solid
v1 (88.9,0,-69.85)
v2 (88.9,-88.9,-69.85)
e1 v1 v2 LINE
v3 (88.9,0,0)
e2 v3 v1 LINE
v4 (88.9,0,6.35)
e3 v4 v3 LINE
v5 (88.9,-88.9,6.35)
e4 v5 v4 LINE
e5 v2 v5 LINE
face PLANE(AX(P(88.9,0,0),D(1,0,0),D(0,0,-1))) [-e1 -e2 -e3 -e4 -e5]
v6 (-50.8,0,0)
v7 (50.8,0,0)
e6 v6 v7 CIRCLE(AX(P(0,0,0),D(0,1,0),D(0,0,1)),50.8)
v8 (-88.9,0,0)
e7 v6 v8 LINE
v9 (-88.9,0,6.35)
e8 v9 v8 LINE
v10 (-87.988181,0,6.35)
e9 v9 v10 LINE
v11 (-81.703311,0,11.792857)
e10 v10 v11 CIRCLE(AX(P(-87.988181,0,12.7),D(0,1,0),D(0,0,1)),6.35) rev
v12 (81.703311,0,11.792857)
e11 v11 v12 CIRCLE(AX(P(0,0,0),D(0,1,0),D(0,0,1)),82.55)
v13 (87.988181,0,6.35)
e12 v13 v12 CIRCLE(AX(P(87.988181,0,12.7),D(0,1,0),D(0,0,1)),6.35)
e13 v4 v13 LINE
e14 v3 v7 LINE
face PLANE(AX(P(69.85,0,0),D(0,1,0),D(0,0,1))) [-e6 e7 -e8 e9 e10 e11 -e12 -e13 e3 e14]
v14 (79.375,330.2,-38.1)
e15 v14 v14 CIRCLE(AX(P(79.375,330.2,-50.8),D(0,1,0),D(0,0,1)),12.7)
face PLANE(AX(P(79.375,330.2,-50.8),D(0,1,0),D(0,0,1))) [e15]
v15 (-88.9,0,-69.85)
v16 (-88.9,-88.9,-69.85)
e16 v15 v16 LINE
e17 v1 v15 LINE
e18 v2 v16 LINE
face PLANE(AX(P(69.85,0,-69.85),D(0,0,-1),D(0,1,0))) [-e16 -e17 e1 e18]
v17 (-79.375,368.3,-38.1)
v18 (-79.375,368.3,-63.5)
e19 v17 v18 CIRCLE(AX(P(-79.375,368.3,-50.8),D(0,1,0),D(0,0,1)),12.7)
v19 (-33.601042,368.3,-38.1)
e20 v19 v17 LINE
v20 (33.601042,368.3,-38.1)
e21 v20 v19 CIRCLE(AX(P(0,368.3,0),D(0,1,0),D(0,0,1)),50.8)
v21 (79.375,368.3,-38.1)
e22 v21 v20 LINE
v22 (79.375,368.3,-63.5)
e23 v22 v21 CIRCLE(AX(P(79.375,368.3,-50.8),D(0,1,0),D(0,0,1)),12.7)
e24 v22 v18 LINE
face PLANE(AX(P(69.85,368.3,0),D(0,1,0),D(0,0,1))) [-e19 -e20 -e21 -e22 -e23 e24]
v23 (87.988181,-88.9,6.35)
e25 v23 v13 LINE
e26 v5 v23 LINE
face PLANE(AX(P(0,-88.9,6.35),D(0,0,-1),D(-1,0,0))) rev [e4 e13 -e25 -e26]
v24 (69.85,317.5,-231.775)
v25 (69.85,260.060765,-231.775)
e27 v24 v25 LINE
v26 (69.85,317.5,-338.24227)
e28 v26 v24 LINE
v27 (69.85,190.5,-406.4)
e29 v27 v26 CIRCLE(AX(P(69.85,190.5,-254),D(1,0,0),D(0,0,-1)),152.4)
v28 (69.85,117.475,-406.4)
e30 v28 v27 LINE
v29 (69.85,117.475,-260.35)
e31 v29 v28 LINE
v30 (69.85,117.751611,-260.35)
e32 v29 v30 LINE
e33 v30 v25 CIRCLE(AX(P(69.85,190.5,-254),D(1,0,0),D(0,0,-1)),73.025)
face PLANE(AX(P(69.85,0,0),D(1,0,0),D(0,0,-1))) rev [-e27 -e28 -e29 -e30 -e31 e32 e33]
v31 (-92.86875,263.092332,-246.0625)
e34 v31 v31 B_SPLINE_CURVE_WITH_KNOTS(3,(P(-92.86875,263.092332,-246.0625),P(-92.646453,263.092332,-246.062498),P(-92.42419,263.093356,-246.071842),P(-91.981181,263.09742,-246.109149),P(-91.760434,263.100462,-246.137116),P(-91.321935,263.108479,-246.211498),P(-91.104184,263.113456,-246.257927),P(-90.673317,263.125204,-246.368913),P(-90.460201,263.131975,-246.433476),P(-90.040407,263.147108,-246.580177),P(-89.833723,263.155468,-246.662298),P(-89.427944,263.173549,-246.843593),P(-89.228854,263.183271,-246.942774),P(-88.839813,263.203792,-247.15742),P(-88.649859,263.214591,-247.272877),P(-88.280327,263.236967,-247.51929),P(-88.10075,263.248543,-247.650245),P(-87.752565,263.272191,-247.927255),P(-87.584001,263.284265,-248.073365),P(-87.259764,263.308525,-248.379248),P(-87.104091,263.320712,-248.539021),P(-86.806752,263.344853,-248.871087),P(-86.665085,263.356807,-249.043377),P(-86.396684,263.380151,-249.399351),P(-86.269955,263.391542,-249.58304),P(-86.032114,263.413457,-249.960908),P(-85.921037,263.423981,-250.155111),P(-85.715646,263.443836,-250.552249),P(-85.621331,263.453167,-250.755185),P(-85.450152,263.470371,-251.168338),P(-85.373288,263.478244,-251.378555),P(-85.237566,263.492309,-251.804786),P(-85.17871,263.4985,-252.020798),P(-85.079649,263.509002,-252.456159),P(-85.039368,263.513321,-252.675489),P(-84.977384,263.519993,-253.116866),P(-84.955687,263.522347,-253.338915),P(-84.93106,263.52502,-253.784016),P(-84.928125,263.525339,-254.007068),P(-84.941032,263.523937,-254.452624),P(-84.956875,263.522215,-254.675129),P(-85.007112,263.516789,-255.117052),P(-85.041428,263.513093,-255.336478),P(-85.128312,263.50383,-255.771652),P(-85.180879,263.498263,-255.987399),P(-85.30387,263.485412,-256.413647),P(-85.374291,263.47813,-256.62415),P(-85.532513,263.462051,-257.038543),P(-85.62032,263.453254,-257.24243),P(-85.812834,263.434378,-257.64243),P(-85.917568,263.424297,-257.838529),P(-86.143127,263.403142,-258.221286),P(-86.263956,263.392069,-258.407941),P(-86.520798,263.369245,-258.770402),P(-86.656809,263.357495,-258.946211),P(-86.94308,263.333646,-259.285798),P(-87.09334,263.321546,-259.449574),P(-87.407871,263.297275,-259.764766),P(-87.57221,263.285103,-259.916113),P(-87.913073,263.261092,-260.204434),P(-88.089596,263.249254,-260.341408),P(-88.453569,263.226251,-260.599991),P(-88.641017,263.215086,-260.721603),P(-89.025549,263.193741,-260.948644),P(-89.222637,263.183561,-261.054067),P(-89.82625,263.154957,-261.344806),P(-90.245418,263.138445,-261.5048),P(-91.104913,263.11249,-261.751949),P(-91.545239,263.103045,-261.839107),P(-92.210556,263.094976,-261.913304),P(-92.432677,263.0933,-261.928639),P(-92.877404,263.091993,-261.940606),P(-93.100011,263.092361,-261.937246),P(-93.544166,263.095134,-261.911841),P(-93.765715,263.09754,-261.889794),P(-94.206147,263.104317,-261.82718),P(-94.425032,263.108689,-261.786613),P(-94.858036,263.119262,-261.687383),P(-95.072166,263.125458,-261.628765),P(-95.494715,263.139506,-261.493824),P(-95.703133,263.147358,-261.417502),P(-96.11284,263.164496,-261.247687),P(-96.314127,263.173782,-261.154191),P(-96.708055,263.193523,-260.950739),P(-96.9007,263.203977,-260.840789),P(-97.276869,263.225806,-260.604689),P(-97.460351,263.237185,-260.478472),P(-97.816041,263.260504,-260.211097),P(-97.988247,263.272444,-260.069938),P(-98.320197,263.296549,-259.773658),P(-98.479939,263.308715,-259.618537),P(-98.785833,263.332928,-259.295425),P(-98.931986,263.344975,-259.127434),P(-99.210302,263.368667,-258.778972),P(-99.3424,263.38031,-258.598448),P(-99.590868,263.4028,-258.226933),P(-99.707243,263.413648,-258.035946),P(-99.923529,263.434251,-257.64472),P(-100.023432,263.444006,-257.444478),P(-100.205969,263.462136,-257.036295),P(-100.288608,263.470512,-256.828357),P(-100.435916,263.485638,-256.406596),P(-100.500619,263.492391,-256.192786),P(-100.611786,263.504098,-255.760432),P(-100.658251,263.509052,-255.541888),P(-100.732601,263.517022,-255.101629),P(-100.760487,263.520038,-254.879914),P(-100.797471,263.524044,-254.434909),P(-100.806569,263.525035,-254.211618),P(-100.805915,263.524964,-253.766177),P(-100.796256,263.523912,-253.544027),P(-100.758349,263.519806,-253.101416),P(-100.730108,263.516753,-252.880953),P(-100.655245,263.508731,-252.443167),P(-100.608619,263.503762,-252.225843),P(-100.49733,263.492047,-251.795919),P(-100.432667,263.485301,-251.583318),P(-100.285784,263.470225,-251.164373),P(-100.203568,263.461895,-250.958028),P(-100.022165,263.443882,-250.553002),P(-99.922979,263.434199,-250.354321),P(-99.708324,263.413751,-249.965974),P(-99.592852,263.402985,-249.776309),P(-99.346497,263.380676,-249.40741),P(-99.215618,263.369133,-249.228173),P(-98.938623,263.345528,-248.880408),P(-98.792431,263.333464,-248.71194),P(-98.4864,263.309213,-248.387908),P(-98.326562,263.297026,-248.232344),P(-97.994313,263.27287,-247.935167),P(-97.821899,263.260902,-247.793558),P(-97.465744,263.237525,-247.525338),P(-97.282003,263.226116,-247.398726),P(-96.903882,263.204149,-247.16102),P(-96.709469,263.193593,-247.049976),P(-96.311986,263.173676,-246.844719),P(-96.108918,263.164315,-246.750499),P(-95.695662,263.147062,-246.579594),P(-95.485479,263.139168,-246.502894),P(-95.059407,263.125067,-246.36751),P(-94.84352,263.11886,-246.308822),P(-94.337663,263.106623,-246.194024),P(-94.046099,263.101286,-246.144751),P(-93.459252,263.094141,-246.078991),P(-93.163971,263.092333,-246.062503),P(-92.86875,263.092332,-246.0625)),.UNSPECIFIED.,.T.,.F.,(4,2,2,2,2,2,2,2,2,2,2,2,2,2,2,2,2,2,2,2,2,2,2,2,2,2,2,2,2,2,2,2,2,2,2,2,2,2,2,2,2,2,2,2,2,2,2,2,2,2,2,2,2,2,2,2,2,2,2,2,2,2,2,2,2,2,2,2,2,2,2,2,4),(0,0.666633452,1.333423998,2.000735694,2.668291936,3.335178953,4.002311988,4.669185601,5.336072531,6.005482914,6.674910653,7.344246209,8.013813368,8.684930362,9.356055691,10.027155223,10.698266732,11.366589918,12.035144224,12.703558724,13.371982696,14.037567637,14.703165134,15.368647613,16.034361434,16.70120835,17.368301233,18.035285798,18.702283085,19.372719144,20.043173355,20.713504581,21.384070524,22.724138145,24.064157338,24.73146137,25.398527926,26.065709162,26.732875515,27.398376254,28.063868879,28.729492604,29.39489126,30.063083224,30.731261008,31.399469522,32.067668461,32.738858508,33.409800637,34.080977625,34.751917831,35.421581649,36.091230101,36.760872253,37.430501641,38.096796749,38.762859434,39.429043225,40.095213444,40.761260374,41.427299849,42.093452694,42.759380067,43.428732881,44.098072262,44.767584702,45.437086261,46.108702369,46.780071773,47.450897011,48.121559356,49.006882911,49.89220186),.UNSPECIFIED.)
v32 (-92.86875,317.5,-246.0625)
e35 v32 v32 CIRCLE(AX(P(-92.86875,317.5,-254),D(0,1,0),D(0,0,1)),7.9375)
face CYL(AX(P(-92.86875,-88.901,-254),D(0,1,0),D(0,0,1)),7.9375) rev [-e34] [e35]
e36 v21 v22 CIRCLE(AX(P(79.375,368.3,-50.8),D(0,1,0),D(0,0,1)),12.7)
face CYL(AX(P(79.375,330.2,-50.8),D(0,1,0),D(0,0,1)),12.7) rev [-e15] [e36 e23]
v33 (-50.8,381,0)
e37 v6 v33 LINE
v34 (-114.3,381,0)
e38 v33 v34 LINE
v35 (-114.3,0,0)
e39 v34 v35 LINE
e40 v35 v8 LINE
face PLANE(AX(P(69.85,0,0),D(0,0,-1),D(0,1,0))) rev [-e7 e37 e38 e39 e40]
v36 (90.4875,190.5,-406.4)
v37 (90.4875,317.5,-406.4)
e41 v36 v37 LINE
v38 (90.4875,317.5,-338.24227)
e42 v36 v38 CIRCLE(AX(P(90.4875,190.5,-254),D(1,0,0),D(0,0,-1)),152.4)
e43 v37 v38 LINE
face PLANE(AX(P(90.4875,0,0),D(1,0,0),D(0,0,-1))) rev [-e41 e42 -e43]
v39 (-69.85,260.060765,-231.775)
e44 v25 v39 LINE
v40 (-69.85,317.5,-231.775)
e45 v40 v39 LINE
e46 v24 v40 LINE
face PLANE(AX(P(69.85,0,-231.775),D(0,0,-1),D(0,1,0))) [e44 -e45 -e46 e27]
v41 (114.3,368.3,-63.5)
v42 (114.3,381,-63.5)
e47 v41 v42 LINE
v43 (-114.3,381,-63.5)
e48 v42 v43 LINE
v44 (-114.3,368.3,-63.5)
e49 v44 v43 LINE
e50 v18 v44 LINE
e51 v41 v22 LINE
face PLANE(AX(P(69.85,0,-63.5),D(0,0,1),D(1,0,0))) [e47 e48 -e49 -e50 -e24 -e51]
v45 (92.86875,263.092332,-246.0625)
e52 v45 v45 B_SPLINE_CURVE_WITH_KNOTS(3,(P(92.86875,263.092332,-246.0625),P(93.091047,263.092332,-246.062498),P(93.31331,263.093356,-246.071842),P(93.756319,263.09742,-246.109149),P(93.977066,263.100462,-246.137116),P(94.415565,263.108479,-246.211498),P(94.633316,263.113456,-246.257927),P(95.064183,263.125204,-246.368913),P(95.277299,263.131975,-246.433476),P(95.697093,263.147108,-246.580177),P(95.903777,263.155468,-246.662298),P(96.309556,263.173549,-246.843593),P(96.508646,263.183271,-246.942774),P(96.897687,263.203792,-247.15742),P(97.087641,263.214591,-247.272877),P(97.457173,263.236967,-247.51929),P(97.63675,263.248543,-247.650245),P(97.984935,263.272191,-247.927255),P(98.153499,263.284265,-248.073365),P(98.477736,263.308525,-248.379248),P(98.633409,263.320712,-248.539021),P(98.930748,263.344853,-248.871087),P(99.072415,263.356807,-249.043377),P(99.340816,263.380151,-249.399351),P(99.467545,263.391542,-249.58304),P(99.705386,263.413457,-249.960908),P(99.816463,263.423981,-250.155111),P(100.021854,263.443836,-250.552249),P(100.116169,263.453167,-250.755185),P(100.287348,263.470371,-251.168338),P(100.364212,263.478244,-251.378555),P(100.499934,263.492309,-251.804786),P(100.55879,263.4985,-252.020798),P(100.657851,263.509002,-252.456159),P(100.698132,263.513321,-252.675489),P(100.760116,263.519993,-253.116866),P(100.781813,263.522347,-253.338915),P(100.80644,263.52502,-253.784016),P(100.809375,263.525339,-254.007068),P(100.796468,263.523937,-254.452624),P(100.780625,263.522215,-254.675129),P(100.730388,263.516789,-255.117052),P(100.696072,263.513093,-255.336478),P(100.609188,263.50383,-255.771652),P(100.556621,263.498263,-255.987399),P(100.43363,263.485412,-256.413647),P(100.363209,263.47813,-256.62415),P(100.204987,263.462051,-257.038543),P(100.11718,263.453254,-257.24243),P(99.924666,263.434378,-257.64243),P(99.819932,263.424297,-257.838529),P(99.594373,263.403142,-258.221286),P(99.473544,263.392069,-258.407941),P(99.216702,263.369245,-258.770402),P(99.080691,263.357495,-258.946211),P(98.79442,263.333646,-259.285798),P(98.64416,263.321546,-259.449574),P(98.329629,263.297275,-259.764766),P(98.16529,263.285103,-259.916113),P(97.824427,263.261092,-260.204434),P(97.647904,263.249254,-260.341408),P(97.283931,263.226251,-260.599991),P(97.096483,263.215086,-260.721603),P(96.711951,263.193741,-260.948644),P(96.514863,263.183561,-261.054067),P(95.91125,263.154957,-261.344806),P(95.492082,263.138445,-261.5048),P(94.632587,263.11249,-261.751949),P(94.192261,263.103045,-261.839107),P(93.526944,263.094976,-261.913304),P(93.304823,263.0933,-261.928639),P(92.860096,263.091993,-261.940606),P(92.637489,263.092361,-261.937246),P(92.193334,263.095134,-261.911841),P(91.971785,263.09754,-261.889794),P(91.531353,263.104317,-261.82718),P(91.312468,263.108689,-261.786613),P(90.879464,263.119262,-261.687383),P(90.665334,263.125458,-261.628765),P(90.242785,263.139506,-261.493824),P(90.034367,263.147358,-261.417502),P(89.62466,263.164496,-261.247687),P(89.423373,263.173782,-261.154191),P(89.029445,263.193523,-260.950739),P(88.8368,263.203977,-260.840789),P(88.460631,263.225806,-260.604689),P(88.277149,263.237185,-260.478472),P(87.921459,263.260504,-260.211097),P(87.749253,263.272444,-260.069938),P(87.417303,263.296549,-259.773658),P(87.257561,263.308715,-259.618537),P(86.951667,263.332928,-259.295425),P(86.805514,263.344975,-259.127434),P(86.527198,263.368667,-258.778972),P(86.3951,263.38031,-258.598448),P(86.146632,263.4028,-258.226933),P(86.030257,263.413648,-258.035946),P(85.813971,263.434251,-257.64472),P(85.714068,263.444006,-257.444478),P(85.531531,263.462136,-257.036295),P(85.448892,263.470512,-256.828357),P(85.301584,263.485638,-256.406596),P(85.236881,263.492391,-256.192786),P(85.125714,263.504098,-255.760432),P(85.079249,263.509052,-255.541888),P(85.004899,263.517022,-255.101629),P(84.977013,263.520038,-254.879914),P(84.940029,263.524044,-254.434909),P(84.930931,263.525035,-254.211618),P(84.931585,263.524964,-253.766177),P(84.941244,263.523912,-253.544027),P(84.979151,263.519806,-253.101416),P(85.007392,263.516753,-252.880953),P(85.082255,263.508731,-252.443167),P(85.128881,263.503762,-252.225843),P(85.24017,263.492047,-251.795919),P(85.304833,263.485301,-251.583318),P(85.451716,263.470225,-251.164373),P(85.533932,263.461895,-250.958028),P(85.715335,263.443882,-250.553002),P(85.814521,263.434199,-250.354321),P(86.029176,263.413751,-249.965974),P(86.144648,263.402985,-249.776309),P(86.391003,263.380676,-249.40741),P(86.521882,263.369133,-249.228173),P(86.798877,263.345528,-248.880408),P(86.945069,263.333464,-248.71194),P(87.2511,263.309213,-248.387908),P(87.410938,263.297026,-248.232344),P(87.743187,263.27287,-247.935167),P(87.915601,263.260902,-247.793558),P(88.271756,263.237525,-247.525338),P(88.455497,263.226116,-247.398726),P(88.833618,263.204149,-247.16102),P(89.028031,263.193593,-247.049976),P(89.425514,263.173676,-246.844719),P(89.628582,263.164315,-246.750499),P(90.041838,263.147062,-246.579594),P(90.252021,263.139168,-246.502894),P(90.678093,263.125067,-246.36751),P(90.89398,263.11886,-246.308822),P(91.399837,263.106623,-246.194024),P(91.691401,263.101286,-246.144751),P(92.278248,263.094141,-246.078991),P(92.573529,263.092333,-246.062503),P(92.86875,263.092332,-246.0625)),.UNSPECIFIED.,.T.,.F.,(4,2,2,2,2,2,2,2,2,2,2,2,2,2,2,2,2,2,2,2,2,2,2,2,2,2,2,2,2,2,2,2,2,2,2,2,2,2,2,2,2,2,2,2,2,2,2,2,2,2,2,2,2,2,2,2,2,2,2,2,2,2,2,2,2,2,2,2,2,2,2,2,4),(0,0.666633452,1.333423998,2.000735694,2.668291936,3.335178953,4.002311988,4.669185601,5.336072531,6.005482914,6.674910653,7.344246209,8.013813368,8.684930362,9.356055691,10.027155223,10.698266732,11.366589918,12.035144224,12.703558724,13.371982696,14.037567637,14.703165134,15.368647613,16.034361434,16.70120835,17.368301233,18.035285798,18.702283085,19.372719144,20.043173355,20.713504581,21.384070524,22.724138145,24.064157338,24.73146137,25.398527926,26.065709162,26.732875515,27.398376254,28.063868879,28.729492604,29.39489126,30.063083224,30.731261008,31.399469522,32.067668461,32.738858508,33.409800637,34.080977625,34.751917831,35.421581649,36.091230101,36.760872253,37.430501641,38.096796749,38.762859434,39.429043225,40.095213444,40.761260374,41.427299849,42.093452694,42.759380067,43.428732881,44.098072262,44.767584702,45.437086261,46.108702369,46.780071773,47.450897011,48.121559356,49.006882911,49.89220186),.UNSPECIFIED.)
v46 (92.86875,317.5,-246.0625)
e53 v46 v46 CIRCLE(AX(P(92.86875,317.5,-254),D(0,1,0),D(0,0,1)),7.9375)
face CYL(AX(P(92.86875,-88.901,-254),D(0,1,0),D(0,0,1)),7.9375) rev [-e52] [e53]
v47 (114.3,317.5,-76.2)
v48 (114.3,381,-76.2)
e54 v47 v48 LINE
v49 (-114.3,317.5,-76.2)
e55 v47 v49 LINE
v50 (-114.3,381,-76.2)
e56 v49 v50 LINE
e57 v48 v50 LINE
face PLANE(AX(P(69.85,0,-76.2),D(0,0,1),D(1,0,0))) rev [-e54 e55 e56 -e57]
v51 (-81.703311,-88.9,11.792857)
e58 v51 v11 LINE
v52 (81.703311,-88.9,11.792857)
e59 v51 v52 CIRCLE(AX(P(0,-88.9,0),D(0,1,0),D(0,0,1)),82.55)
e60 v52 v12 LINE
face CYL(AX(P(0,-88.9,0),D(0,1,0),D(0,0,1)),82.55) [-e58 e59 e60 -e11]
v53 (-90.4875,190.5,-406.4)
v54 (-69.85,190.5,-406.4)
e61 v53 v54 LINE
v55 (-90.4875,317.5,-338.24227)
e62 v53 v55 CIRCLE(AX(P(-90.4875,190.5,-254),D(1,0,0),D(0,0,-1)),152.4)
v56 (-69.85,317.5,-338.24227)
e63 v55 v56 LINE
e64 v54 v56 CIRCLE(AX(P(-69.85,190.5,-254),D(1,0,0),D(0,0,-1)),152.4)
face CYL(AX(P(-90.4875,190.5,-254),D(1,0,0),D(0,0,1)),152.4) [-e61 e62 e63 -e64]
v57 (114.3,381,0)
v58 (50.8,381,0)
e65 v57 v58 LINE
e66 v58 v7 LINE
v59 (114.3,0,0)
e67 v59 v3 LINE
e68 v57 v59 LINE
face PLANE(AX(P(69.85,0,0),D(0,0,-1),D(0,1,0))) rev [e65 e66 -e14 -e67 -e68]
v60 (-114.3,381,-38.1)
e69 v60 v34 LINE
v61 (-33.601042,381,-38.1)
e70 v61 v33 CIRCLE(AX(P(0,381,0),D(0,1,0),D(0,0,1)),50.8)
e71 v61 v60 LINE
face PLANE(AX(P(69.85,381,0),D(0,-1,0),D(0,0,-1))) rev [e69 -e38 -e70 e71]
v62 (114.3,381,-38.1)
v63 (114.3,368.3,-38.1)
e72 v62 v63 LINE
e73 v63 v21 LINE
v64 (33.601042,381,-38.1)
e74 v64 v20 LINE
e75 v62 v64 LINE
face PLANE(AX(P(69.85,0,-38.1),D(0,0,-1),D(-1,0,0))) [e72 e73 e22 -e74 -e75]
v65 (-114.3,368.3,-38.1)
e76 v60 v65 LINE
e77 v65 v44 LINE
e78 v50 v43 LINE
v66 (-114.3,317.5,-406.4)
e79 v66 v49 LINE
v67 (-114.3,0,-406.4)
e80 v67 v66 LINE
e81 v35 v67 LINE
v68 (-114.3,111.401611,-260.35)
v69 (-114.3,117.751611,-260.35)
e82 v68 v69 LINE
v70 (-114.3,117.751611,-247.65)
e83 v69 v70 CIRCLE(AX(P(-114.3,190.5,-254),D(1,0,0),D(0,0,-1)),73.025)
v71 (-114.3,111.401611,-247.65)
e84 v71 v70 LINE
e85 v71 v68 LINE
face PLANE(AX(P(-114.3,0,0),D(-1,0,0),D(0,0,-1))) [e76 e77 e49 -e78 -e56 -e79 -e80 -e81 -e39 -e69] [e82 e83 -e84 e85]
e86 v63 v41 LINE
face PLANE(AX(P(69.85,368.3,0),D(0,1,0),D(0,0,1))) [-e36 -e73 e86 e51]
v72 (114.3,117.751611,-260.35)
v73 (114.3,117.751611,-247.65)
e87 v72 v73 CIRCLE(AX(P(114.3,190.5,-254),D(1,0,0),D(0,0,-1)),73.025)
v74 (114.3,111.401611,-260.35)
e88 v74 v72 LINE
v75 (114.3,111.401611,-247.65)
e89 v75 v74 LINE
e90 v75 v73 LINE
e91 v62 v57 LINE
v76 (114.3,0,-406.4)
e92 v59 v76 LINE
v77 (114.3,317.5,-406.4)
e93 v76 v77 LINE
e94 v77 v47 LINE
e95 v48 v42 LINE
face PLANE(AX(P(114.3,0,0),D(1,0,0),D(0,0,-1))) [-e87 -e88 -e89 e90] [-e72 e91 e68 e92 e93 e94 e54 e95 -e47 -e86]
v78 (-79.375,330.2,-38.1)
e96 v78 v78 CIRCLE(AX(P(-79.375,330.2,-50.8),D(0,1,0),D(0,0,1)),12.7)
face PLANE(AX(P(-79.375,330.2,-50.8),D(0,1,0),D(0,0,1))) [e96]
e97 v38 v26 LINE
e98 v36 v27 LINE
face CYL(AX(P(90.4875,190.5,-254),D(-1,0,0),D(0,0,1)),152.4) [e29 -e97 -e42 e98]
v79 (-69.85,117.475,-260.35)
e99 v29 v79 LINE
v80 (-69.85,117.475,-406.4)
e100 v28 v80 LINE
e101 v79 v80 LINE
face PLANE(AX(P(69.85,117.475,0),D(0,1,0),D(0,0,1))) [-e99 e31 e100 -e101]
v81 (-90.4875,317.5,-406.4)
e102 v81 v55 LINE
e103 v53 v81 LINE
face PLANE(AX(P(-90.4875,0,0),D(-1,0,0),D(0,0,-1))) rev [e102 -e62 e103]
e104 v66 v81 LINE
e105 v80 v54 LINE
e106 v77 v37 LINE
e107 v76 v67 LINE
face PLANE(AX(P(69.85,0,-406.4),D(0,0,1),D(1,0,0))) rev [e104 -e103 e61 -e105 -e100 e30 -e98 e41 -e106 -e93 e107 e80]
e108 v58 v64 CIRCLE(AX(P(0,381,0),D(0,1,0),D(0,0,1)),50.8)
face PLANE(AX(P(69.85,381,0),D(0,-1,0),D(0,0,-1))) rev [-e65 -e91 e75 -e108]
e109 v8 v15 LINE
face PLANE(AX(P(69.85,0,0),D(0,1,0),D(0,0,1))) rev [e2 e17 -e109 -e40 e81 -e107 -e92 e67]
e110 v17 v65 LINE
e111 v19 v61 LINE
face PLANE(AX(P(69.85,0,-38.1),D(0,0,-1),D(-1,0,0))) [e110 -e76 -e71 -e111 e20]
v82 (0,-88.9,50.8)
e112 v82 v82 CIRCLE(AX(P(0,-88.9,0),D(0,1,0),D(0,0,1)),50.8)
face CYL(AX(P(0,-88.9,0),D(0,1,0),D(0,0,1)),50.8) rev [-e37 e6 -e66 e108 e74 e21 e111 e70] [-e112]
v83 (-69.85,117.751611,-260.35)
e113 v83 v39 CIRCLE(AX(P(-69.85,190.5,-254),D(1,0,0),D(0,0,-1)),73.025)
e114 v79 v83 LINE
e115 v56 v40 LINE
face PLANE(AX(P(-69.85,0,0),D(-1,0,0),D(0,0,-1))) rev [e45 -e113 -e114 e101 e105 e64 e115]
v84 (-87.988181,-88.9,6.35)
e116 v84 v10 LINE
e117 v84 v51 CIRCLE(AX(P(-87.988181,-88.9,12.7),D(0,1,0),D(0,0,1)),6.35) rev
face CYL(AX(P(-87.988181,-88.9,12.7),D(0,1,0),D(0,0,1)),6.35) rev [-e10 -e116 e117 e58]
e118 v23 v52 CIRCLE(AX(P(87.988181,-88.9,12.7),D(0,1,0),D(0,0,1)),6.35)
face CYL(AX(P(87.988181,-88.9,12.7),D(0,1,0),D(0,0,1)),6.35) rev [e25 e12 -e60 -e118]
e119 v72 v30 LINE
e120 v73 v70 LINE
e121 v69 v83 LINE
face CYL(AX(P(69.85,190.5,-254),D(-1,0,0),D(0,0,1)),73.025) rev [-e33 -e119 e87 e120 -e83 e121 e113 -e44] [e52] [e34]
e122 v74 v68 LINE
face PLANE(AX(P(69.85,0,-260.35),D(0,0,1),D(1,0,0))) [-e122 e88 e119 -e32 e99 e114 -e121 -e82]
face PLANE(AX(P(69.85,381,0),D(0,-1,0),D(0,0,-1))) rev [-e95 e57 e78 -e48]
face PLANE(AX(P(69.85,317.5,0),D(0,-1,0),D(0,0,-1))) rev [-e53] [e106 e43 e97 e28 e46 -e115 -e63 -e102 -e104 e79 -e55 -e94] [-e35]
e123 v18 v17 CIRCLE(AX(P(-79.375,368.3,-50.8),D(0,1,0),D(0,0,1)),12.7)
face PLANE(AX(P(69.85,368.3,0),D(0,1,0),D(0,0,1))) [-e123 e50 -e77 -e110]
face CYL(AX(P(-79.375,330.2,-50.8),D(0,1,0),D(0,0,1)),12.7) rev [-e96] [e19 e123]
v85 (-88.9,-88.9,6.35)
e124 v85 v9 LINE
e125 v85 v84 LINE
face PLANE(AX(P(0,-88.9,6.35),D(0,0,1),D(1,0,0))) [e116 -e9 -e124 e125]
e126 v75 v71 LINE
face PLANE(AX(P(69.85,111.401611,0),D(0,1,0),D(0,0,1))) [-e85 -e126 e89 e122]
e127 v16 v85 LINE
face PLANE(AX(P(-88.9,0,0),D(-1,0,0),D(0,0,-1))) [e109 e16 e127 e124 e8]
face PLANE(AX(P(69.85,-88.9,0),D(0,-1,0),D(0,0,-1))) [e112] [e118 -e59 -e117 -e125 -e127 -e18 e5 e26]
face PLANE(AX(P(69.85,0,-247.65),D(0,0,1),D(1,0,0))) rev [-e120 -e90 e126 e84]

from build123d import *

# Parameters (mm, degrees)
BOSS_EXTRUDE2_DEPTH     = 69.85
BOSS_EXTRUDE3_START     = 69.85
BOSS_EXTRUDE3_DEPTH     = 20.6375
BOSS_EXTRUDE4_START     = 90.4875
BOSS_EXTRUDE4_DEPTH     = 23.8125
BOSS_EXTRUDE5_START     = 69.85
BOSS_EXTRUDE5_DEPTH     = 19.05
SKETCH2_R               = 50.8
CUT_EXTRUDE1_DEPTH      = 632.689369865
SKETCH3_R               = 12.7
CUT_EXTRUDE2_DEPTH      = 38.1
CUT_EXTRUDE3_REACH      = 587.992
CUT_EXTRUDE3_END_RADIUS = 73.025
SKETCH4_R               = 7.9375


# Read off the part's stored shape, not the designer's step: Boss-Extrude4
with BuildPart() as part:
    # Sketch1 → Boss-Extrude2 (new body)
    with BuildSketch(Plane(origin=(0, 0, 0), x_dir=(0, 0, -1), z_dir=(1, 0, 0))):
        with BuildLine():
            Line((0, 381), (0, 0))
            Line((0, 0), (-82.55, 0))
            Line((-82.55, 0), (-82.55, -88.9))
            Line((-82.55, -88.9), (69.85, -88.9))
            Line((69.85, -88.9), (69.85, 0))
            Line((69.85, 0), (406.4, 0))
            Line((406.4, 0), (406.4, 117.475))
            Line((406.4, 117.475), (260.35, 117.475))
            Line((260.35, 117.475), (260.35, 111.401610843))
            Line((260.35, 111.401610843), (247.65, 111.401610843))
            Line((247.65, 111.401610843), (247.65, 117.751610843))
            ThreePointArc((247.65, 117.751610843), (181.425166335, 182.404066236), (231.775, 260.060764803))
            Line((231.775, 260.060764803), (231.775, 317.5))
            Line((231.775, 317.5), (76.2, 317.5))
            Line((76.2, 317.5), (76.2, 381))
            Line((76.2, 381), (63.5, 381))
            Line((63.5, 381), (63.5, 368.3))
            Line((63.5, 368.3), (38.1, 368.3))
            Line((38.1, 368.3), (38.1, 381))
            Line((38.1, 381), (0, 381))
        make_face()
    boss_extrude2 = extrude(amount=BOSS_EXTRUDE2_DEPTH)

    # Sketch1<4> → Boss-Extrude3 (add)
    with BuildSketch(Plane(origin=(0, 0, 0), x_dir=(0, 0, -1), z_dir=(1, 0, 0)).offset(BOSS_EXTRUDE3_START)):
        with BuildLine():
            Line((0, 381), (0, 0))
            Line((0, 0), (406.4, 0))
            Line((406.4, 0), (406.4, 190.5))
            ThreePointArc((406.4, 190.5), (388.283807472, 262.566768006), (338.242269675, 317.5))
            Line((338.242269675, 317.5), (76.2, 317.5))
            Line((76.2, 317.5), (76.2, 381))
            Line((76.2, 381), (63.5, 381))
            Line((63.5, 381), (63.5, 368.3))
            Line((63.5, 368.3), (38.1, 368.3))
            Line((38.1, 368.3), (38.1, 381))
            Line((38.1, 381), (0, 381))
        make_face()
        with BuildLine():
            Line((260.35, 117.751610843), (260.35, 111.401610843))
            Line((260.35, 111.401610843), (247.65, 111.401610843))
            Line((247.65, 111.401610843), (247.65, 117.751610843))
            ThreePointArc((247.65, 117.751610843), (254, 263.525), (260.35, 117.751610843))
        make_face(mode=Mode.SUBTRACT)
    boss_extrude3 = extrude(amount=BOSS_EXTRUDE3_DEPTH)

    # Boss-Extrude4 outline → Boss-Extrude4 (add)
    with BuildSketch(Plane(origin=(0, 0, 0), x_dir=(0, 0, -1), z_dir=(1, 0, 0)).offset(BOSS_EXTRUDE4_START)):
        Polygon((406.4, 317.5), (76.2, 317.5), (76.2, 381), (63.5, 381), (63.5, 368.3), (38.1, 368.3), (38.1, 381), (0, 381), (0, 0), (406.4, 0), align=None)
        with BuildLine():
            Line((247.65, 111.401610843), (247.65, 117.751610843))
            ThreePointArc((247.65, 117.751610843), (254, 263.525), (260.35, 117.751610843))
            Line((260.35, 117.751610843), (260.35, 111.401610843))
            Line((260.35, 111.401610843), (247.65, 111.401610843))
        make_face(mode=Mode.SUBTRACT)
    boss_extrude4 = extrude(amount=BOSS_EXTRUDE4_DEPTH)

    # Sketch1<6> → Boss-Extrude5 (add)
    with BuildSketch(Plane(origin=(0, 0, 0), x_dir=(0, 0, -1), z_dir=(1, 0, 0)).offset(BOSS_EXTRUDE5_START)):
        Polygon((69.85, 0), (0, 0), (-82.55, 0), (-82.55, -88.9), (69.85, -88.9), align=None)
    boss_extrude5 = extrude(amount=BOSS_EXTRUDE5_DEPTH)

    # Mirror2: Boss-Extrude2, Boss-Extrude3, Boss-Extrude4, Boss-Extrude5 across plane
    add(boss_extrude2.mirror(Plane(origin=(0, 0, 0), x_dir=(0, 0, 1), z_dir=(1, 0, 0))))
    add(boss_extrude3.mirror(Plane(origin=(0, 0, 0), x_dir=(0, 0, 1), z_dir=(1, 0, 0))))
    add(boss_extrude4.mirror(Plane(origin=(0, 0, 0), x_dir=(0, 0, 1), z_dir=(1, 0, 0))))
    add(boss_extrude5.mirror(Plane(origin=(0, 0, 0), x_dir=(0, 0, 1), z_dir=(1, 0, 0))))

    # Sketch2 → Cut-Extrude1 (cut, through all)
    with BuildSketch(Plane(origin=(0, 381, 0), x_dir=(1, 0, 0), z_dir=(0, 1, 0))):
        with Locations(Location((0, 0, 0), (0, 0, 270))):
            Circle(SKETCH2_R)
        with BuildLine():
            Line((-88.9, -88.9), (88.9, -88.9))
            Line((88.9, -88.9), (88.9, -6.35))
            Line((88.9, -6.35), (87.988181024, -6.35))
            ThreePointArc((87.988181024, -6.35), (83.831130216, -7.899851193), (81.703310951, -11.792857143))
            ThreePointArc((81.703310951, -11.792857143), (0, -82.55), (-81.703310951, -11.792857143))
            ThreePointArc((-81.703310951, -11.792857143), (-83.831130216, -7.899851193), (-87.988181024, -6.35))
            Line((-87.988181024, -6.35), (-88.9, -6.35))
            Line((-88.9, -6.35), (-88.9, -88.9))
        make_face()
    extrude(amount=-CUT_EXTRUDE1_DEPTH, mode=Mode.SUBTRACT)

    # Sketch3 → Cut-Extrude2 (cut)
    with BuildSketch(Plane(origin=(0, 368.3, 0), x_dir=(1, 0, 0), z_dir=(0, 1, 0))):
        with Locations(Location((-79.375, 50.8, 0), (0, 0, 270))):
            Circle(SKETCH3_R)
        with Locations(Location((79.375, 50.8, 0), (0, 0, 270))):
            Circle(SKETCH3_R)
    extrude(amount=-CUT_EXTRUDE2_DEPTH, mode=Mode.SUBTRACT)

    # Cut-Extrude3: up to this cylinder (the profile starts outside it)
    cut_extrude3_end = Plane(origin=(0, 190.5, -254), z_dir=(-1, 0, 0)) * Cylinder(CUT_EXTRUDE3_END_RADIUS, 1508.7715, mode=Mode.PRIVATE)
    # Sketch4 → Cut-Extrude3 (cut, up to the surface)
    with BuildSketch(Plane(origin=(0, 317.5, 0), x_dir=(1, 0, 0), z_dir=(0, 1, 0)), mode=Mode.PRIVATE) as cut_extrude3_sk1:
        with Locations(Location((-92.86875, 254, 0), (0, 0, 270))):
            Circle(SKETCH4_R)
    cut_extrude3_tool1 = extrude(cut_extrude3_sk1.sketch, amount=-CUT_EXTRUDE3_REACH, mode=Mode.PRIVATE) - cut_extrude3_end
    add(cut_extrude3_tool1.solids().sort_by_distance((-92.86875, 317.5, -254))[0], mode=Mode.SUBTRACT)
    # Sketch4 → Cut-Extrude3 (cut, up to the surface)
    with BuildSketch(Plane(origin=(0, 317.5, 0), x_dir=(1, 0, 0), z_dir=(0, 1, 0)), mode=Mode.PRIVATE) as cut_extrude3_sk2:
        with Locations(Location((92.86875, 254, 0), (0, 0, 270))):
            Circle(SKETCH4_R)
    cut_extrude3_tool2 = extrude(cut_extrude3_sk2.sketch, amount=-CUT_EXTRUDE3_REACH, mode=Mode.PRIVATE) - cut_extrude3_end
    add(cut_extrude3_tool2.solids().sort_by_distance((92.86875, 317.5, -254))[0], mode=Mode.SUBTRACT)


solid = part.part
